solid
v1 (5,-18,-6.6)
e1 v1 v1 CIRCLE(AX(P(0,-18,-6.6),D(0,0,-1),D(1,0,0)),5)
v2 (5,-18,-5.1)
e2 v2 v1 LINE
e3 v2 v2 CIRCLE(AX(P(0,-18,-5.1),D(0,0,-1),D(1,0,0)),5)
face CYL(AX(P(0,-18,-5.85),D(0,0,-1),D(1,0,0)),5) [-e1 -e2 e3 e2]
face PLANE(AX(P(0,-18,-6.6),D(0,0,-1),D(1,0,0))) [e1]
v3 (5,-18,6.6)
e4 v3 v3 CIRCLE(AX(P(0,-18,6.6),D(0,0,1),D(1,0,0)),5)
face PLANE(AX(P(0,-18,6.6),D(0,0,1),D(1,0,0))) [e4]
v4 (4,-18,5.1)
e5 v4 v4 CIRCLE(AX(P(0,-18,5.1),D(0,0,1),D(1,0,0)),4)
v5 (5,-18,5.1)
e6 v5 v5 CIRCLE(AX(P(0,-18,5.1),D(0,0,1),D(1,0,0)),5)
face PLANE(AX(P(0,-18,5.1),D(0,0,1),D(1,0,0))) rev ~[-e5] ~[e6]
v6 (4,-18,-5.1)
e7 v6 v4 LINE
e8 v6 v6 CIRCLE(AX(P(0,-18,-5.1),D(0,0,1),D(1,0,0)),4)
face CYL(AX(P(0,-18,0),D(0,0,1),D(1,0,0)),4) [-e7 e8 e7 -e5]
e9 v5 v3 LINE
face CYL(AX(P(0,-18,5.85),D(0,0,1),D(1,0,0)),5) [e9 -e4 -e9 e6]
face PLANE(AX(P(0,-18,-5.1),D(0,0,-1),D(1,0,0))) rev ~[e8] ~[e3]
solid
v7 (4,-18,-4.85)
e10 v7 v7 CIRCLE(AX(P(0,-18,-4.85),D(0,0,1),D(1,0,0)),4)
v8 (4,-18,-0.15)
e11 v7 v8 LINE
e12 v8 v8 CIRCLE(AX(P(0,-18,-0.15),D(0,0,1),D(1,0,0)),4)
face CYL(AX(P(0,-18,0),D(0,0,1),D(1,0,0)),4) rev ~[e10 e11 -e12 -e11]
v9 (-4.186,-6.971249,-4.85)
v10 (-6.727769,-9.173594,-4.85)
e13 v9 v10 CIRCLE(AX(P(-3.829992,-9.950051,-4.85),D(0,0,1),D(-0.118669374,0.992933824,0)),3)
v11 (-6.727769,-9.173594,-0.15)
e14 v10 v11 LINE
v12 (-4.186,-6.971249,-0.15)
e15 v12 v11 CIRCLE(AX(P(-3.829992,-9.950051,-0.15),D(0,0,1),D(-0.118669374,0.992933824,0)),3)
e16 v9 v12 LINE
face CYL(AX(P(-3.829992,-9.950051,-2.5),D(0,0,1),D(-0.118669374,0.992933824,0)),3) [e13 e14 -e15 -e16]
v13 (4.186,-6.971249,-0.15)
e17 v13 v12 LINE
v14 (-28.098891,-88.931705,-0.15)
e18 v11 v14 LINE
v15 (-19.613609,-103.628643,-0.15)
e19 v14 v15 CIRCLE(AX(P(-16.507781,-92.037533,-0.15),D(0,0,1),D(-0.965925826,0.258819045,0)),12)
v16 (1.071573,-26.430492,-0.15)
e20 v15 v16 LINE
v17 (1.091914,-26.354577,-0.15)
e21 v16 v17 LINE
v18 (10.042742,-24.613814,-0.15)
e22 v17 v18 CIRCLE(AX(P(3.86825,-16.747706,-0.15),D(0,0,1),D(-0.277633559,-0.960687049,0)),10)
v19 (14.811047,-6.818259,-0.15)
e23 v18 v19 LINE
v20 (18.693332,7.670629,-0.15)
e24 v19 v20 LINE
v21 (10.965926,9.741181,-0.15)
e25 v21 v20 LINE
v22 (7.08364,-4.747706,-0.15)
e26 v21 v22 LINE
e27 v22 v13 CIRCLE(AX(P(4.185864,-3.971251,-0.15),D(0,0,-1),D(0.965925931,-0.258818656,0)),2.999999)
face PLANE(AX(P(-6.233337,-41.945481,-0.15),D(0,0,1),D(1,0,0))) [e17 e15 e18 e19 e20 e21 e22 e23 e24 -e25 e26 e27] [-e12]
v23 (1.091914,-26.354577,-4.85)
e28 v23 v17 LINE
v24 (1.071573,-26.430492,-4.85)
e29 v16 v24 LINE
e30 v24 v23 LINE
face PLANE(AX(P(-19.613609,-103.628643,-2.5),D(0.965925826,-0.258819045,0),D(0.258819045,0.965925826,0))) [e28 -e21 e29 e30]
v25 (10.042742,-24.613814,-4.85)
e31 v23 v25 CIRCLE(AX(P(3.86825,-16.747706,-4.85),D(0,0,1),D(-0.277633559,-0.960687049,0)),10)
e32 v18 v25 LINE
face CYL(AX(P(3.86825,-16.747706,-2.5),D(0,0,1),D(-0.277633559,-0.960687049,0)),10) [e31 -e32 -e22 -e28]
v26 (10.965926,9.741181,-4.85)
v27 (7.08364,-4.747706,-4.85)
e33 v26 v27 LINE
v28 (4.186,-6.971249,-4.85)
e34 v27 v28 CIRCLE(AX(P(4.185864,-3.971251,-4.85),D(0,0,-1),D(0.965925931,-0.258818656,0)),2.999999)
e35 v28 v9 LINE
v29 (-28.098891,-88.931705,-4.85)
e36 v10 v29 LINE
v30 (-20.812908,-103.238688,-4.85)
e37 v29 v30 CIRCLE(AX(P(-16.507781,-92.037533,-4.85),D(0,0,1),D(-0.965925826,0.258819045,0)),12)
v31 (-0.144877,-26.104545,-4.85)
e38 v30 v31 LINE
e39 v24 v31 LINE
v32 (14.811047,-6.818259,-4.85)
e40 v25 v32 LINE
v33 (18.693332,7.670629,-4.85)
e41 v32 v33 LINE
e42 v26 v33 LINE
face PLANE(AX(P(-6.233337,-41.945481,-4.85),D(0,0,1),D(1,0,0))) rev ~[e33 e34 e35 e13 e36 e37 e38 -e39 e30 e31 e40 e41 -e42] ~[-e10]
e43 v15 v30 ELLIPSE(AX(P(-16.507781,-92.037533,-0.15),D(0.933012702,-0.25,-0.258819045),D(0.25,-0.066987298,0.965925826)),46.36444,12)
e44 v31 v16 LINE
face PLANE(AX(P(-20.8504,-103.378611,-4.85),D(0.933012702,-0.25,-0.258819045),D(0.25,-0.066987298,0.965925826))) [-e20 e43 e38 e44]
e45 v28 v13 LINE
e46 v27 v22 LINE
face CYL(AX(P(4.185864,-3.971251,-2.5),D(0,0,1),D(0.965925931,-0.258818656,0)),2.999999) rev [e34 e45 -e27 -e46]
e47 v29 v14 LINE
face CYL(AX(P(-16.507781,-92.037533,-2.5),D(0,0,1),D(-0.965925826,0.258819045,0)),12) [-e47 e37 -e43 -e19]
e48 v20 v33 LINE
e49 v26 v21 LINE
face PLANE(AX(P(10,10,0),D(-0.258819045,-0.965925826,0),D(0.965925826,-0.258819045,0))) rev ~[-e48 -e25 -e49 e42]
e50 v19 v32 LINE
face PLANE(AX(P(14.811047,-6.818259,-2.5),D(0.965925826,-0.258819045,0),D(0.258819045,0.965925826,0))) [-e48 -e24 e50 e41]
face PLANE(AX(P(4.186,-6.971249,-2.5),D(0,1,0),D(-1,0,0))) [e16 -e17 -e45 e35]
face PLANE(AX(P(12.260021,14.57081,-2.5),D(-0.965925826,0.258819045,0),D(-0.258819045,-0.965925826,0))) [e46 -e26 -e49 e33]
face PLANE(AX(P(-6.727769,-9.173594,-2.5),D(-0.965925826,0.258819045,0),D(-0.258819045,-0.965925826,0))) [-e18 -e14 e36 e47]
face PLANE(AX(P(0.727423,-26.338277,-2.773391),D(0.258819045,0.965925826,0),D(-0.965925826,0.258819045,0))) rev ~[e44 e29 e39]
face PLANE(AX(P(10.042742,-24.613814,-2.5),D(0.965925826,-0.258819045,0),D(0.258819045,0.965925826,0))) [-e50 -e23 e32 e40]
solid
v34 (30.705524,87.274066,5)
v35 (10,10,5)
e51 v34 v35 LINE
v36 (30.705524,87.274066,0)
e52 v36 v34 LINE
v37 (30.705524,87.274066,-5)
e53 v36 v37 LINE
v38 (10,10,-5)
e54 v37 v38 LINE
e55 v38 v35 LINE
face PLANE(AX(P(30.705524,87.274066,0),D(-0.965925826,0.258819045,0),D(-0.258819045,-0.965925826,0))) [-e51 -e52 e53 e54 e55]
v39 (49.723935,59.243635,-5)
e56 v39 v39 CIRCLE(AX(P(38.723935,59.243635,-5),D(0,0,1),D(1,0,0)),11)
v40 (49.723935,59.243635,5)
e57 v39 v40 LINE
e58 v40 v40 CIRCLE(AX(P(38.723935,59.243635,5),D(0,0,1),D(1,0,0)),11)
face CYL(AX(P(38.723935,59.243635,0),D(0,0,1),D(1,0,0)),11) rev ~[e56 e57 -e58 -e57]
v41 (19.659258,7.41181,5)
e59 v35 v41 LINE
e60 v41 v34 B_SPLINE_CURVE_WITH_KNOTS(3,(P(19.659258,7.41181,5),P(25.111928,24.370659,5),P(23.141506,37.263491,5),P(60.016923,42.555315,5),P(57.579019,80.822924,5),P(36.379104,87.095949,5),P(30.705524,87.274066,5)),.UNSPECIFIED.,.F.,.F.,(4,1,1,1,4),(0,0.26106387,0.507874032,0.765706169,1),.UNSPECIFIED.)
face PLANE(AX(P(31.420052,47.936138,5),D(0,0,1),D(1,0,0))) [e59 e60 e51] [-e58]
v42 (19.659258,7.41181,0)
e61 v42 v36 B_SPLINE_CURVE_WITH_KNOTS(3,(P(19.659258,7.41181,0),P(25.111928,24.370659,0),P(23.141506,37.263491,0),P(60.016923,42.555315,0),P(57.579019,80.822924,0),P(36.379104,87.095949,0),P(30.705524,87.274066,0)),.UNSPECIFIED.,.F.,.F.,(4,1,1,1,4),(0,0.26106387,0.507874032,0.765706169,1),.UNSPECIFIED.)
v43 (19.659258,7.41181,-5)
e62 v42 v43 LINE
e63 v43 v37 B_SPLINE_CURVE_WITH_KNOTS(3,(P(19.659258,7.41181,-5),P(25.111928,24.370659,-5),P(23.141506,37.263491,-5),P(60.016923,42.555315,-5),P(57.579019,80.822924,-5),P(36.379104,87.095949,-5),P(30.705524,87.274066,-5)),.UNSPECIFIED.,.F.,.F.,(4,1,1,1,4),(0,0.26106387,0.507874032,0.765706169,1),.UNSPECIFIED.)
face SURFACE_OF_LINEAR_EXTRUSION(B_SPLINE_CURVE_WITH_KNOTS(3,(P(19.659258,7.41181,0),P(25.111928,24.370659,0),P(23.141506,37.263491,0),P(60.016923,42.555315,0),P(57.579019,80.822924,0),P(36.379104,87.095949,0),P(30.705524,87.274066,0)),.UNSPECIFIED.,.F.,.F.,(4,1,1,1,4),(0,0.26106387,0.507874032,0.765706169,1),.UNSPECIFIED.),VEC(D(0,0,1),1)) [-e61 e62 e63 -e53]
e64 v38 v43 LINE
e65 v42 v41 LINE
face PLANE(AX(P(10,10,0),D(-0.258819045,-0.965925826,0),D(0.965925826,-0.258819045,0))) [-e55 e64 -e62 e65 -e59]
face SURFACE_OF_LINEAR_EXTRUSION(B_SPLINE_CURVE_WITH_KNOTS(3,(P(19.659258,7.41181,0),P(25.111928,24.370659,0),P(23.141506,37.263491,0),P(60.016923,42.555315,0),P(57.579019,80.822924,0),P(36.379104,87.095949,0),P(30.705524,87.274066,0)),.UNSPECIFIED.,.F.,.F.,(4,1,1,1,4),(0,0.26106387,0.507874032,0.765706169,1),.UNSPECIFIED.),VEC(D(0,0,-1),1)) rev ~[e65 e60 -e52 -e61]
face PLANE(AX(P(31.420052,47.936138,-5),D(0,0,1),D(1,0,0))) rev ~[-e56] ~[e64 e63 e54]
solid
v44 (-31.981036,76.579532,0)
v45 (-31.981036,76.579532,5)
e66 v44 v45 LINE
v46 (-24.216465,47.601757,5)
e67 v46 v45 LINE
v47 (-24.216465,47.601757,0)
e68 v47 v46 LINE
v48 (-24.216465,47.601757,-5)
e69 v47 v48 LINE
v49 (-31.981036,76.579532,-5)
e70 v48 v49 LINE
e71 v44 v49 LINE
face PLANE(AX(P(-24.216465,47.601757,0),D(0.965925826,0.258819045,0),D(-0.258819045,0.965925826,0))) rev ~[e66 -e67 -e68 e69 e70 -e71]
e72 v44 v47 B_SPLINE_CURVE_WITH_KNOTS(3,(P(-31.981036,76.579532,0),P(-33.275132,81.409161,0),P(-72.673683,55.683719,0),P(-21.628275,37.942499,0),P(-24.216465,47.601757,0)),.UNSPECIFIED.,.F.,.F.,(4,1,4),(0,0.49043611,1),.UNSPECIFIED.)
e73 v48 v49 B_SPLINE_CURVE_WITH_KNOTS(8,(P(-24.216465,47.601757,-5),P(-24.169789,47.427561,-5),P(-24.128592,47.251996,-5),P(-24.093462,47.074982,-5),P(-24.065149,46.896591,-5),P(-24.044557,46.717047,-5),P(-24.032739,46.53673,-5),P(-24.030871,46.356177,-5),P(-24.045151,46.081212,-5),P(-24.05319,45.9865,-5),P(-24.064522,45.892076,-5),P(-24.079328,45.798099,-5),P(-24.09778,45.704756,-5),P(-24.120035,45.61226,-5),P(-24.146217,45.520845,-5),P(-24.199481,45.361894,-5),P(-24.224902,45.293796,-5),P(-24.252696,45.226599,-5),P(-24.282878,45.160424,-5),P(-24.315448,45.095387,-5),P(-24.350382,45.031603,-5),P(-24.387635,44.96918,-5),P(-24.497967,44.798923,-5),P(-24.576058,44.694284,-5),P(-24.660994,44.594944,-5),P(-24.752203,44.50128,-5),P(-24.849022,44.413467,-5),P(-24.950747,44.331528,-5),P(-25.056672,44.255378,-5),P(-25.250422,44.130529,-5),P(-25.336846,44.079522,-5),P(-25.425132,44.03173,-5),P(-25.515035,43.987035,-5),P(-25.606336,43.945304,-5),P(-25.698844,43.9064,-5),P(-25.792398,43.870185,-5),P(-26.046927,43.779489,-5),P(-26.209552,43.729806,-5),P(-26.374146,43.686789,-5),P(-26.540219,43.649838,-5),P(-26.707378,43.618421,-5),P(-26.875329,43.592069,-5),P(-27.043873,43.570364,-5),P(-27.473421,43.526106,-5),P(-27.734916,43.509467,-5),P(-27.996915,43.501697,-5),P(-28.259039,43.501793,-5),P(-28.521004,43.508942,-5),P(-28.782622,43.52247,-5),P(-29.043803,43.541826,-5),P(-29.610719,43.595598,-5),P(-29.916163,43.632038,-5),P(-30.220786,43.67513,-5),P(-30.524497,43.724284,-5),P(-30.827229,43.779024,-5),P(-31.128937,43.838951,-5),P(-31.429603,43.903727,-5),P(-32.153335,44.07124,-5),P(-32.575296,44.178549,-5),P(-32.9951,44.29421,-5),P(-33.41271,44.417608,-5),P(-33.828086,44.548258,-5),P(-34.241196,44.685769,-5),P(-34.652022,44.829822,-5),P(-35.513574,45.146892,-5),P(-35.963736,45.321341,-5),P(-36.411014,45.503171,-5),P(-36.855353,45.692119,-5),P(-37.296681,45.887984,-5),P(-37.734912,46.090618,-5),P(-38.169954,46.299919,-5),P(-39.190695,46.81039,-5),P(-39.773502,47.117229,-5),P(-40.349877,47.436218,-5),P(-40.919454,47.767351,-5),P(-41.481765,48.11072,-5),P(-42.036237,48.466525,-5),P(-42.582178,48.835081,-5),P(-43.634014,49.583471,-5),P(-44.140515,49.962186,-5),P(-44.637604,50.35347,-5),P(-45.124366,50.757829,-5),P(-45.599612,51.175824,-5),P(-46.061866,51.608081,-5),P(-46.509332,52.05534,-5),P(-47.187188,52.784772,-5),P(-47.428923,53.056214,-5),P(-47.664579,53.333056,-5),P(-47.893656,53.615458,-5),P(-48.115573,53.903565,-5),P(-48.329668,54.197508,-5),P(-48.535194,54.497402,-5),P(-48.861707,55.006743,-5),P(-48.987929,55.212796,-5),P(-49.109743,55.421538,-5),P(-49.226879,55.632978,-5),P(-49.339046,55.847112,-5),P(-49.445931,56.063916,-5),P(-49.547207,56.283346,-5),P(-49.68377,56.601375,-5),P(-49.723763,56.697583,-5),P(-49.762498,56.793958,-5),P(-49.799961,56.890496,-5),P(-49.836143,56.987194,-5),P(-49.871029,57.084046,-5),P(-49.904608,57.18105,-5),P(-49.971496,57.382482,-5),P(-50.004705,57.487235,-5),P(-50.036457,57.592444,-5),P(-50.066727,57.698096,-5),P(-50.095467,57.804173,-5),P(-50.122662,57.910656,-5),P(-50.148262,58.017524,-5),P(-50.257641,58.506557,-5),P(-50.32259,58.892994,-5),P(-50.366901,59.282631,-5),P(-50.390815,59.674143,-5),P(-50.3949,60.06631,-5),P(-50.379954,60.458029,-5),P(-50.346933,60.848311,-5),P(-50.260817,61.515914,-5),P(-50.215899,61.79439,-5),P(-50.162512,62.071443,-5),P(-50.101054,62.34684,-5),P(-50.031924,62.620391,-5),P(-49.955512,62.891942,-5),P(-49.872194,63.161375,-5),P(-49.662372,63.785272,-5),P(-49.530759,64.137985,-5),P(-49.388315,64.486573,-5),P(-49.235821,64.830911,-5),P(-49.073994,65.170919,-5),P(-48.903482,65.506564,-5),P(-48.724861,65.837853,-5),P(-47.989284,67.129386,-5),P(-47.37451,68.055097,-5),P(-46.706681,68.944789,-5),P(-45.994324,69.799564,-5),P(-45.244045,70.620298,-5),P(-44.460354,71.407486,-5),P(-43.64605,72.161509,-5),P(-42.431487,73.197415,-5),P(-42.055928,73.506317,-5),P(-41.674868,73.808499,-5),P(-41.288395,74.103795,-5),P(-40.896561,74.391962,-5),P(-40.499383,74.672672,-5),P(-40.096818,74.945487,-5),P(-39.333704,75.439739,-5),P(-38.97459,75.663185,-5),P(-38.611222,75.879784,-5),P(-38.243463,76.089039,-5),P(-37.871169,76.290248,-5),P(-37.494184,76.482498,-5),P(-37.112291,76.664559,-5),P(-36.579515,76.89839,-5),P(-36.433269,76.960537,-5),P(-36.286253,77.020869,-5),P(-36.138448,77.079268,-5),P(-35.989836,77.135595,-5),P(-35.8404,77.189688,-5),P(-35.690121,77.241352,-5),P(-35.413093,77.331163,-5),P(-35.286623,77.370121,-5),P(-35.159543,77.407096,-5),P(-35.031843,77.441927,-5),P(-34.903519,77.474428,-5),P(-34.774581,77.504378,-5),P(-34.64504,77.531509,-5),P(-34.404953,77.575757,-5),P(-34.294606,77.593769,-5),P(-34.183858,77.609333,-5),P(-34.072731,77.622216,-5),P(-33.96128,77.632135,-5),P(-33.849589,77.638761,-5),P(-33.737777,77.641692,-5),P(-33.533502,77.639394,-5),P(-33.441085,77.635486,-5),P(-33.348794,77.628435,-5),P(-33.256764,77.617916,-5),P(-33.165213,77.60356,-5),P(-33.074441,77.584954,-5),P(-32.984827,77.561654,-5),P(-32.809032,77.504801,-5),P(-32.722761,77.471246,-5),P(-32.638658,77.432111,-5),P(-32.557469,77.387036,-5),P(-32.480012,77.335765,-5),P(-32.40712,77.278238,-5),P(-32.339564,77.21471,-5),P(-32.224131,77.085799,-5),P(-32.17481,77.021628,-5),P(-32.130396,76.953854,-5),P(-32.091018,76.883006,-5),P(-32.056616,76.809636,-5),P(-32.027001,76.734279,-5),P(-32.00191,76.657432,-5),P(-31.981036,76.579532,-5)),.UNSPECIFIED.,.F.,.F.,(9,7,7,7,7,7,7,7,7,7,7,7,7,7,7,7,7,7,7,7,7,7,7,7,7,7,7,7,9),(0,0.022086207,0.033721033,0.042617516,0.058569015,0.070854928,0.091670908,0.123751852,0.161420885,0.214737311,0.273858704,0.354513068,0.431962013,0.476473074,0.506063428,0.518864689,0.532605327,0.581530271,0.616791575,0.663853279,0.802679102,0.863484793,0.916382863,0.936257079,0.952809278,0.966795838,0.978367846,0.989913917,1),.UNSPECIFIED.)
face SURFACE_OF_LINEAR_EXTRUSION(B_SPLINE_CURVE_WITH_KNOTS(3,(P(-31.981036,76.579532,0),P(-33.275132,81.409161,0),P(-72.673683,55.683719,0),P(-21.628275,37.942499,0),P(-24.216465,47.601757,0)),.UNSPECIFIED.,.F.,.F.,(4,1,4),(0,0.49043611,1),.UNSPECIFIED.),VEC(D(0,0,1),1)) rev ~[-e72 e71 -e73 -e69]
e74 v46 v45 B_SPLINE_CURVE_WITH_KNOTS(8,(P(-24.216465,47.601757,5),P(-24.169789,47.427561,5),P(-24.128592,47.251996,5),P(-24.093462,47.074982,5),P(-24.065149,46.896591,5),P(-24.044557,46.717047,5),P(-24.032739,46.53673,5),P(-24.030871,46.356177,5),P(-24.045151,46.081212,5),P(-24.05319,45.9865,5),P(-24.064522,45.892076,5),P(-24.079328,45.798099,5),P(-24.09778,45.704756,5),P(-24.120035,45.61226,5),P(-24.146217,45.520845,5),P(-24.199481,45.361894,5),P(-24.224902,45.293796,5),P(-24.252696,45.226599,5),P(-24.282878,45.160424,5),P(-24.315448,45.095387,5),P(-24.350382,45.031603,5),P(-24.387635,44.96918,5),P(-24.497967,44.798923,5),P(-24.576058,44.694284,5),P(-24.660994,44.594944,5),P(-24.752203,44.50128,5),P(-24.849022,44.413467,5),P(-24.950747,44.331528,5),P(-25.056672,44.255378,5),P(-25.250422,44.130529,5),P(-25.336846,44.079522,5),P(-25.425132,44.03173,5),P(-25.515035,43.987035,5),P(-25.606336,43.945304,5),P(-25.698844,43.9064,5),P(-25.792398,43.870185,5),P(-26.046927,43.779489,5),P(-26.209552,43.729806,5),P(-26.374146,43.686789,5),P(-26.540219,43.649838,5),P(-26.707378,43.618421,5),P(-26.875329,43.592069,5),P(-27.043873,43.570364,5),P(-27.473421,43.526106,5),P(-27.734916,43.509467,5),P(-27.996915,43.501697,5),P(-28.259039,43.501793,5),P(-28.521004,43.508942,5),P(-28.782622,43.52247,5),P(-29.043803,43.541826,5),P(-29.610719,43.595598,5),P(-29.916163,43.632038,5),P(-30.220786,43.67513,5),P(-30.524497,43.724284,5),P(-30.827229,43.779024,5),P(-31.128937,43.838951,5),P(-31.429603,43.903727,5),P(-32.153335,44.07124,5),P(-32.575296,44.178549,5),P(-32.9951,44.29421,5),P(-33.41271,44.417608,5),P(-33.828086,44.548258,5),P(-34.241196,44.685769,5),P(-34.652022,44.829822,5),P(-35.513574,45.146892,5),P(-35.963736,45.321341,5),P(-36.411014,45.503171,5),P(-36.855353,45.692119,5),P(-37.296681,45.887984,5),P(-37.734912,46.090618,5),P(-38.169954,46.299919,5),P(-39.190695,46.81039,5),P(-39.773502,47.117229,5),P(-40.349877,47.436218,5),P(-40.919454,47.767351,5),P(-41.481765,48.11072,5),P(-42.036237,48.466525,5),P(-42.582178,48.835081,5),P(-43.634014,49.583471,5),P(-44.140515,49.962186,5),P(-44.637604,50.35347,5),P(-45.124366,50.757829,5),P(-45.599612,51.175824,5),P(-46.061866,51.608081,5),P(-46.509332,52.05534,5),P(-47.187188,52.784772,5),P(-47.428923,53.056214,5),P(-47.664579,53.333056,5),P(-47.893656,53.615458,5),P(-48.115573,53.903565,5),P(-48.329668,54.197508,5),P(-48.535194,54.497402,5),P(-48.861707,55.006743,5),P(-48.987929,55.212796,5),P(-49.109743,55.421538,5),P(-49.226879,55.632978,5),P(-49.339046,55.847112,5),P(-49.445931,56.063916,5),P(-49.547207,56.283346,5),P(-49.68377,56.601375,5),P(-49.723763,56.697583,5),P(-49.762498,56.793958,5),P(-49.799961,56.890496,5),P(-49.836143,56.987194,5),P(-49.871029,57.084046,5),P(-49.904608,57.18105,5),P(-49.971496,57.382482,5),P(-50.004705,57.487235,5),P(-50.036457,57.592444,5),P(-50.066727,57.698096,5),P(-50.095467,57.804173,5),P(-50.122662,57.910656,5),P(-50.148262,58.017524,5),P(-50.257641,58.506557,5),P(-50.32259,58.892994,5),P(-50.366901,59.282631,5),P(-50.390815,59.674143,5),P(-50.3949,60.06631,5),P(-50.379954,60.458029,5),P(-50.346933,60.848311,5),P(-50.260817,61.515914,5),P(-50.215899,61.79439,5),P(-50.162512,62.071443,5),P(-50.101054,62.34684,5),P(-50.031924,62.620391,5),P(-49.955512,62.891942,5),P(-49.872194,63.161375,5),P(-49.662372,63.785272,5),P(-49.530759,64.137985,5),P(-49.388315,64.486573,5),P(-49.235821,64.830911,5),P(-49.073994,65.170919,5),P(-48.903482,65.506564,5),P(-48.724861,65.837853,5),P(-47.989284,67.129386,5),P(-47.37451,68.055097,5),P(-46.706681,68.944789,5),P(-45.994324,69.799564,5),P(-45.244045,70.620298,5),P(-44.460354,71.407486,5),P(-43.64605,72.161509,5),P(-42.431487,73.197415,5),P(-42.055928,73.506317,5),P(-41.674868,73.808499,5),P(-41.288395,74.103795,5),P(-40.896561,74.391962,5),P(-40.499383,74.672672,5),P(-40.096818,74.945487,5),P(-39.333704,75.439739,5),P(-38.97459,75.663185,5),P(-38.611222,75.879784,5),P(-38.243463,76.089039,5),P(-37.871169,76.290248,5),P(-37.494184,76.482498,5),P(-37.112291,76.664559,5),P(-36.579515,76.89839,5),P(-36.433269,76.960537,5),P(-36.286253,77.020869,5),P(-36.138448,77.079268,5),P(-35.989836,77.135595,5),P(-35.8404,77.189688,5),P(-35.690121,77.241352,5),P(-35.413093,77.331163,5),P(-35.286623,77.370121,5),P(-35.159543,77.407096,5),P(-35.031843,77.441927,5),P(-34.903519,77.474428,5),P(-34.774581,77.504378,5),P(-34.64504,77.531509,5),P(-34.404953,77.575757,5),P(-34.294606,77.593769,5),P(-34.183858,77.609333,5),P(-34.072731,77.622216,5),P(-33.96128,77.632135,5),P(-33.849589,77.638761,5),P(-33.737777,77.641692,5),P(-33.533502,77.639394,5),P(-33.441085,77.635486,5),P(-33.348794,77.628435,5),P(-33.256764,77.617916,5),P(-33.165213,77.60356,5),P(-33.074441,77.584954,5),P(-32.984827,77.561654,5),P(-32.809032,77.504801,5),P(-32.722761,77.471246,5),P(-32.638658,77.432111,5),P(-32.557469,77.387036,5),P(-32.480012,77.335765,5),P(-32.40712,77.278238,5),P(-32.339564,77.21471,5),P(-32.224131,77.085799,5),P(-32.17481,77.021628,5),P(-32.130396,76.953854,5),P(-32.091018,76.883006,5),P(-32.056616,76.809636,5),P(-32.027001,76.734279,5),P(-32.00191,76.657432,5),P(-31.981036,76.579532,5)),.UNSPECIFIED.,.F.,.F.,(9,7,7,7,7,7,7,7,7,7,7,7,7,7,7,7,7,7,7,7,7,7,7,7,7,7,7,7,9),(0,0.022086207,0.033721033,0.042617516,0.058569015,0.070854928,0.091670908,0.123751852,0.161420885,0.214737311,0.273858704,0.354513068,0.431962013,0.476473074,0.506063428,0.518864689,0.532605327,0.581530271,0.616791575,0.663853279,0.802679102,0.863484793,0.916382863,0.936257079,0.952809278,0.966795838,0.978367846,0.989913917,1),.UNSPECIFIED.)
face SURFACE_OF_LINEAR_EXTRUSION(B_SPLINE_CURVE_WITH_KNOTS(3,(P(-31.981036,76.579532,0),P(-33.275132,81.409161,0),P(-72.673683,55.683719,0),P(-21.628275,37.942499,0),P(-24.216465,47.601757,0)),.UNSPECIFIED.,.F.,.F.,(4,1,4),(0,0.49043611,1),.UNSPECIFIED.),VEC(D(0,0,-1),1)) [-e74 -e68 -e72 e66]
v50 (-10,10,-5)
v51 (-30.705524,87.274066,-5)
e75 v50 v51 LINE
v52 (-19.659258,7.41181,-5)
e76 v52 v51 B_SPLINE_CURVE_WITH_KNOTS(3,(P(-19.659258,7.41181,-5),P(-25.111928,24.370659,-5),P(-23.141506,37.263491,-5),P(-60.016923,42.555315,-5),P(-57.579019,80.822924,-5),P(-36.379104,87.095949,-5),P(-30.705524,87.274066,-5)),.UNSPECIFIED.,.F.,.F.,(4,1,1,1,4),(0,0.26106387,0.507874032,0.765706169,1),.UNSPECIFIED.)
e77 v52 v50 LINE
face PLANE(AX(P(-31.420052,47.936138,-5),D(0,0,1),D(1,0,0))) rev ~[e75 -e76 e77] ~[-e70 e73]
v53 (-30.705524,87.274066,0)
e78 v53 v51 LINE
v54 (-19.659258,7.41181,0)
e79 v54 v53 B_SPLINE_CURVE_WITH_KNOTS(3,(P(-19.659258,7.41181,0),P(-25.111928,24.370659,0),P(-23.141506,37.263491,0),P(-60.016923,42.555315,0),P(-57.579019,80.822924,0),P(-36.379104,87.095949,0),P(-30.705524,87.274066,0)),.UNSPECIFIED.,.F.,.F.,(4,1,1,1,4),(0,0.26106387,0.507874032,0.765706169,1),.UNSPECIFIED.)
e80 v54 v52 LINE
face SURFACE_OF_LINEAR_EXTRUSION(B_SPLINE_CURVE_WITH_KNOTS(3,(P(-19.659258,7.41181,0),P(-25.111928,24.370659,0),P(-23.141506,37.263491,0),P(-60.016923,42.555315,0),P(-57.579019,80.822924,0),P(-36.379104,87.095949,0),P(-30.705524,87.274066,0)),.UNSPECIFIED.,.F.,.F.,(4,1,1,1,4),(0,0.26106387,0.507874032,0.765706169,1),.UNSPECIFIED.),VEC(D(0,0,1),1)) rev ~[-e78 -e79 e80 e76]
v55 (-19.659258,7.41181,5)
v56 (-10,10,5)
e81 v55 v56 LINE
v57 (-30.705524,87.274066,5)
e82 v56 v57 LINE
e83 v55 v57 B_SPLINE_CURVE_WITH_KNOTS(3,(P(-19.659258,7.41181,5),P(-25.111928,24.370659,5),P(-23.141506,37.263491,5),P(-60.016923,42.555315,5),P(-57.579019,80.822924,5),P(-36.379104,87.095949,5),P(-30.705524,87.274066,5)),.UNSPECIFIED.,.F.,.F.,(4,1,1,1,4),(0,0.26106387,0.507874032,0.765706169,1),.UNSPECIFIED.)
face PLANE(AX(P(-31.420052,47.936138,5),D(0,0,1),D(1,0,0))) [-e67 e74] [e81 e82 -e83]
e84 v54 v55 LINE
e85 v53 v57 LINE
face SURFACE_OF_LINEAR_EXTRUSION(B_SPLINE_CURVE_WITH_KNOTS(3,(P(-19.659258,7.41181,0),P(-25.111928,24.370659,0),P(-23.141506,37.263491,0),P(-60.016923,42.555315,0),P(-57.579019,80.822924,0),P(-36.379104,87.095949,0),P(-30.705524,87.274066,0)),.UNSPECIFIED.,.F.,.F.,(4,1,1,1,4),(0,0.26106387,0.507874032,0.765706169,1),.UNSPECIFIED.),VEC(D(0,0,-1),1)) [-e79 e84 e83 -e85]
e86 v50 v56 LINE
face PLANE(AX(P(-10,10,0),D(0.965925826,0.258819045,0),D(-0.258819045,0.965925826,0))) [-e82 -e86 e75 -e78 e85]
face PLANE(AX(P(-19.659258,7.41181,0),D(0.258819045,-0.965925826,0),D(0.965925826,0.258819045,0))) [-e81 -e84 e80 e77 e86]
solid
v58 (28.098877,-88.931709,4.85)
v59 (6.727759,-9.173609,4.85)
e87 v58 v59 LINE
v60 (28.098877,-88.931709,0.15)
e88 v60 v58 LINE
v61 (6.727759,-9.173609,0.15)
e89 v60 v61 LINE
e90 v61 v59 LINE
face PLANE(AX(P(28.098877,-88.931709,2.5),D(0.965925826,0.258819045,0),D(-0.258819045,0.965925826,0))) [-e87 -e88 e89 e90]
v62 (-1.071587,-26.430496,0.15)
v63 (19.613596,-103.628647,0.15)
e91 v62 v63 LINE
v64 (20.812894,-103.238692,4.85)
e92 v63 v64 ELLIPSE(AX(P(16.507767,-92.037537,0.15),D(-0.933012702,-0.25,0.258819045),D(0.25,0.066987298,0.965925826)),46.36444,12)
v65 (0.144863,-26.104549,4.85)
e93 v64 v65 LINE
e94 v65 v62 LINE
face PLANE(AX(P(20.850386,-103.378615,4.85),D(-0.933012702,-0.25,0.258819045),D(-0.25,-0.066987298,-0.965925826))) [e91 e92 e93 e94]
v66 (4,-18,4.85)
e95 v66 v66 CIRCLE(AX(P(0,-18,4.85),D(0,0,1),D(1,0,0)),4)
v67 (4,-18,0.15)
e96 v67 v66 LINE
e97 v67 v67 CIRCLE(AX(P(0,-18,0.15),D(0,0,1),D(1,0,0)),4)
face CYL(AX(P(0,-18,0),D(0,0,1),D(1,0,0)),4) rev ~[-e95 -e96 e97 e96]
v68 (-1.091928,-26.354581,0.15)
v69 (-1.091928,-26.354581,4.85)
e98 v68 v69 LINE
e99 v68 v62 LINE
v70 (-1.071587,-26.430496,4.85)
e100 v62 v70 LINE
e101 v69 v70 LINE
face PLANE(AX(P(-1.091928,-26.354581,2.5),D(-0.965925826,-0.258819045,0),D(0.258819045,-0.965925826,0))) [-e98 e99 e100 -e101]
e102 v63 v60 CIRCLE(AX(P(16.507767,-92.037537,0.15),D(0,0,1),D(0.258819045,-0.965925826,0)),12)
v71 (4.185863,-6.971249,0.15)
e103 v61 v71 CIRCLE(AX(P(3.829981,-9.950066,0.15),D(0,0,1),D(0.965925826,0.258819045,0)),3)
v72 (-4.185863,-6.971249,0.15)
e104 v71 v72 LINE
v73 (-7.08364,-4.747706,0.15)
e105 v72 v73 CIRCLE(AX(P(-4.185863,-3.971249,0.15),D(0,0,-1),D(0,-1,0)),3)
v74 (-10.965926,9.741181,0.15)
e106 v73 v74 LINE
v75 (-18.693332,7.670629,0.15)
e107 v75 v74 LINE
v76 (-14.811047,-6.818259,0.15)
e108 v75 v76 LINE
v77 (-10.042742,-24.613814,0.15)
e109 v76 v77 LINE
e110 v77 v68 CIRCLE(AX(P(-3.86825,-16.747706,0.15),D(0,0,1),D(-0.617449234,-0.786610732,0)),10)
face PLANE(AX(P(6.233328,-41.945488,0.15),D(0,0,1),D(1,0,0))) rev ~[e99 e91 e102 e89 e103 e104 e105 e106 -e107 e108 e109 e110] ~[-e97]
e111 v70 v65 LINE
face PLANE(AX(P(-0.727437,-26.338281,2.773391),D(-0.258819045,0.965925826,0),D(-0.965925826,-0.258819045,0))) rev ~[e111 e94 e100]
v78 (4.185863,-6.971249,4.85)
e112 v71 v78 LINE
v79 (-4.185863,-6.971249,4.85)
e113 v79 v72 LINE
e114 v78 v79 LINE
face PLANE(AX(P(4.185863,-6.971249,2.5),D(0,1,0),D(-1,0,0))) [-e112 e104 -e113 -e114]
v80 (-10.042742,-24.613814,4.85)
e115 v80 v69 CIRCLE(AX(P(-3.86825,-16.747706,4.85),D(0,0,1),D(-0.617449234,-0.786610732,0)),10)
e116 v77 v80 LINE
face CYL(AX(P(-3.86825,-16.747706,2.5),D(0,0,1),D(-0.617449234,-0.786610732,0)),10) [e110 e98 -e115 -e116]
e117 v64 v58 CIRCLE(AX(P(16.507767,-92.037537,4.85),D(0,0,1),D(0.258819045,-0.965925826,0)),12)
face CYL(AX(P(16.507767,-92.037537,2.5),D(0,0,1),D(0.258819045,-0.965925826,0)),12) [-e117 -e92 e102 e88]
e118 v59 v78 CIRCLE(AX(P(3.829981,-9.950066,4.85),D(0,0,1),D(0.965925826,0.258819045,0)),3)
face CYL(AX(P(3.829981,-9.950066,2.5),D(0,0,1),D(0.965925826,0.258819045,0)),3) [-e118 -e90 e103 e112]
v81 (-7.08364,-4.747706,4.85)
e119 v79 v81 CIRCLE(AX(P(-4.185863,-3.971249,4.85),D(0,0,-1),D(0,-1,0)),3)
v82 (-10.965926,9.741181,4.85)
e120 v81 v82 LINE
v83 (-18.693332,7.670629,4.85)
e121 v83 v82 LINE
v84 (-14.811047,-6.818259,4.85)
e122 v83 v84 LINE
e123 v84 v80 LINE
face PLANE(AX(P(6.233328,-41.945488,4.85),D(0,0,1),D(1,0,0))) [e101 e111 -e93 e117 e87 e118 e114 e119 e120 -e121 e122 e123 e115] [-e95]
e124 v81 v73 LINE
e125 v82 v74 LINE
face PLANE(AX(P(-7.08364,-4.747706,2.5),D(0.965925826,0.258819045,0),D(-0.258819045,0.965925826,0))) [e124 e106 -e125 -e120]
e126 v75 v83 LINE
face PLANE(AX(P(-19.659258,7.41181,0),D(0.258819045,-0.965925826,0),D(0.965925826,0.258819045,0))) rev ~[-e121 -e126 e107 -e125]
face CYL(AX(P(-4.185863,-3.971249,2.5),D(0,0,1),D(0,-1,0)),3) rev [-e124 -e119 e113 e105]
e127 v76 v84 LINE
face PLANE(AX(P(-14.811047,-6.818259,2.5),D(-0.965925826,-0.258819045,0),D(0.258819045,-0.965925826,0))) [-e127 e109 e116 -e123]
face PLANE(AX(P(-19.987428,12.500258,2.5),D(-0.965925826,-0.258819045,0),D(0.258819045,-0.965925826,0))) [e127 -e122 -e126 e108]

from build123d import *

# Parameters (mm, degrees)
F1_DEPTH  = 5
F3_DEPTH  = 20
F4_R      = 11
F5_DEPTH  = 20
F6_R      = 4
F7_DEPTH  = 6
F10_DEPTH = 2.35
F15_DEPTH = 80
F16_DEPTH = 2.35
F18_R     = 5
F19_DEPTH = 0.75
F22_DEPTH = 80
F24_R     = 5
F25_DEPTH = 0.75


# Not quite as in the source:
# - ends of sketch curves that miss each other by under 0.0002 mm in the source are joined


with BuildPart() as f1:
    # F0 (on Top) → F1 (new body, symmetric)
    with BuildSketch(Plane.XY):
        with BuildLine():
            Line((30.7055236082, 87.2740661031), (10, 10))
            Line((10, 10), (19.6592582629, 7.411809549))
            add(Edge.make_bspline(
                [(19.6592582629, 7.411809549), (25.1119283769, 24.3706590227), (23.1415058885, 37.2634909185), (60.0169233832, 42.5553149198), (57.5790190448, 80.8229242309), (36.3791040972, 87.095948963), (30.7055236082, 87.2740661031)],
                knots=[0, 0, 0, 0, 0.26106387, 0.5078740317, 0.7657061692, 1, 1, 1, 1], degree=3))
        make_face()
    extrude(amount=F1_DEPTH, both=True)

    # F4 (on Top) → F5 (cut, symmetric)
    with BuildSketch(Plane.XY):
        with Locations((38.723934875, 59.2436347694)):
            Circle(F4_R)
    extrude(amount=F5_DEPTH, both=True, mode=Mode.SUBTRACT)


with BuildPart() as f1b:
    # F0 (on Top) → F1, piece 2 (new body, symmetric)
    with BuildSketch(Plane.XY):
        with BuildLine():
            Line((-19.6592582629, 7.411809549), (-10, 10))
            Line((-10, 10), (-30.7055236082, 87.2740661031))
            add(Edge.make_bspline(
                [(-19.6592582629, 7.411809549), (-25.1119283769, 24.3706590227), (-23.1415058885, 37.2634909185), (-60.0169233832, 42.5553149198), (-57.5790190448, 80.8229242309), (-36.3791040972, 87.095948963), (-30.7055236082, 87.2740661031)],
                knots=[0, 0, 0, 0, 0.26106387, 0.5078740317, 0.7657061692, 1, 1, 1, 1], degree=3))
        make_face()
    extrude(amount=F1_DEPTH, both=True)

    # F2 (on Top) → F3 (cut, symmetric)
    with BuildSketch(Plane.XY):
        with BuildLine():
            Line((-24.2164651093, 47.6017568712), (-31.9810364623, 76.5795316598))
            add(Edge.make_bspline(
                [(-31.9810364623, 76.5795316598), (-33.2751316878, 81.4091607913), (-72.673683141, 55.6837191887), (-21.6282746582, 37.9424986083), (-24.2164651093, 47.6017568712)],
                knots=[0, 0, 0, 0, 0.4904361098, 1, 1, 1, 1], degree=3))
        make_face()
    extrude(amount=F3_DEPTH, both=True, mode=Mode.SUBTRACT)


with BuildPart() as f7:
    # F6 (on Top) → F7 (new body, symmetric)
    with BuildSketch(Plane.XY):
        with Locations((0, -18)):
            Circle(F6_R)
    extrude(amount=F7_DEPTH, both=True)

    # F18 (on offset) → F19 (join, symmetric)
    with BuildSketch(Plane.XY.offset(5.85)):
        with Locations((0, -18)):
            Circle(F18_R)
    extrude(amount=F19_DEPTH, both=True)

    # F24 (on offset) → F25 (join, symmetric)
    with BuildSketch(Plane(origin=(0, 0, -5.85), x_dir=(1, 0, 0), z_dir=(0, 0, -1))):
        with Locations((0, 18)):
            Circle(F24_R)
    extrude(amount=F25_DEPTH, both=True)


with BuildPart() as f10:
    # F9 (on offset) → F10 (new body, symmetric)
    with BuildSketch(Plane.XY.offset(2.5)):
        with BuildLine():
            Line((-12.2600210518, 14.5708100863), (-19.9874276621, 12.5002577255))
            Line((-19.9874276621, 12.5002577255), (-14.8110467601, -6.8182588003))
            Line((-14.8110467601, -6.8182588003), (-10.0427421803, -24.613813758))
            ThreePointArc((-10.0427421803, -24.613813758), (-5.7772962336, -26.5637923126), (-1.0919279377, -26.3545808891))
            Line((-1.0919279377, -26.3545808891), (19.6135956705, -103.6286469922))
            ThreePointArc((19.6135956705, -103.6286469922), (26.9000719747, -98.0375370768), (28.0988770448, -88.9317085355))
            Line((28.0988770448, -88.9317085355), (6.7277586225, -9.1736087692))
            ThreePointArc((6.7277586225, -9.1736087692), (5.7944584368, -7.6827262818), (4.1858626709, -6.9712493041))
            Line((4.1858626709, -6.9712493041), (0, -6.9712493041))
            Line((0, -6.9712493041), (-4.1858626709, -6.9712493041))
            ThreePointArc((-4.1858626709, -6.9712493041), (-6.0121469579, -6.351309325), (-7.0836401498, -4.7477064394))
            Line((-7.0836401498, -4.7477064394), (-12.2600210518, 14.5708100863))
        make_face()
    extrude(amount=F10_DEPTH, both=True)

    # F14 (on offset) → F15 (cut)
    with BuildSketch(Plane(origin=(27.2413648185, -101.66615757, 0), x_dir=(-0.9659258263, -0.2588190451, 0), z_dir=(-0.2588190451, 0.9659258263, 0))):
        Polygon((6.6164276508, 4.85), (7.8757888552, 0.15), (7.8757888552, 4.85), align=None)
    extrude(amount=F15_DEPTH, mode=Mode.SUBTRACT)

    # F27: cut F1b
    add(f1b.part, mode=Mode.SUBTRACT)

    # F28: cut F7
    add(f7.part, mode=Mode.SUBTRACT)


with BuildPart() as f16:
    # F12 (on offset) → F16 (new body, symmetric)
    with BuildSketch(Plane.XY.offset(-2.5)):
        with BuildLine():
            Line((19.9874276621, 12.5002577255), (12.2600210518, 14.5708100863))
            Line((12.2600210518, 14.5708100863), (7.0836401498, -4.7477064394))
            ThreePointArc((7.0836401498, -4.7477064394), (6.0122017645, -6.3512678388), (4.186, -6.9712494484))
            Line((4.186, -6.9712494484), (0, -6.9712494484))
            Line((0, -6.9712494484), (-4.186, -6.9712494484))
            ThreePointArc((-4.186, -6.9712494484), (-5.7945173505, -7.6827530429), (-6.7277693578, -9.1735937864))
            Line((-6.7277693578, -9.1735937864), (-28.0988907345, -88.9317045793))
            ThreePointArc((-28.0988907345, -88.9317045793), (-26.9000856645, -98.0375331205), (-19.6136093603, -103.628643036))
            Line((-19.6136093603, -103.628643036), (1.0919142479, -26.3545769328))
            ThreePointArc((1.0919142479, -26.3545769328), (5.7772892396, -26.5637936728), (10.0427421803, -24.613813758))
            Line((10.0427421803, -24.613813758), (14.8110467601, -6.8182588003))
            Line((14.8110467601, -6.8182588003), (19.9874276621, 12.5002577255))
        make_face()
    extrude(amount=F16_DEPTH, both=True)

    # F21 (on offset) → F22 (cut)
    with BuildSketch(Plane(origin=(-27.2413648185, -101.66615757, 0), x_dir=(-0.9659258263, 0.2588190451, 0), z_dir=(0.2588190451, 0.9659258263, 0))):
        Polygon((-6.6164134035, -4.85), (-7.875774608, -0.15), (-7.875774608, -4.85), align=None)
    extrude(amount=F22_DEPTH, mode=Mode.SUBTRACT)

    # F26: cut F1
    add(f1.part, mode=Mode.SUBTRACT)

    # F28: cut F7
    add(f7.part, mode=Mode.SUBTRACT)


solid = Compound([f1.part, f1b.part, f7.part, f10.part, f16.part])
